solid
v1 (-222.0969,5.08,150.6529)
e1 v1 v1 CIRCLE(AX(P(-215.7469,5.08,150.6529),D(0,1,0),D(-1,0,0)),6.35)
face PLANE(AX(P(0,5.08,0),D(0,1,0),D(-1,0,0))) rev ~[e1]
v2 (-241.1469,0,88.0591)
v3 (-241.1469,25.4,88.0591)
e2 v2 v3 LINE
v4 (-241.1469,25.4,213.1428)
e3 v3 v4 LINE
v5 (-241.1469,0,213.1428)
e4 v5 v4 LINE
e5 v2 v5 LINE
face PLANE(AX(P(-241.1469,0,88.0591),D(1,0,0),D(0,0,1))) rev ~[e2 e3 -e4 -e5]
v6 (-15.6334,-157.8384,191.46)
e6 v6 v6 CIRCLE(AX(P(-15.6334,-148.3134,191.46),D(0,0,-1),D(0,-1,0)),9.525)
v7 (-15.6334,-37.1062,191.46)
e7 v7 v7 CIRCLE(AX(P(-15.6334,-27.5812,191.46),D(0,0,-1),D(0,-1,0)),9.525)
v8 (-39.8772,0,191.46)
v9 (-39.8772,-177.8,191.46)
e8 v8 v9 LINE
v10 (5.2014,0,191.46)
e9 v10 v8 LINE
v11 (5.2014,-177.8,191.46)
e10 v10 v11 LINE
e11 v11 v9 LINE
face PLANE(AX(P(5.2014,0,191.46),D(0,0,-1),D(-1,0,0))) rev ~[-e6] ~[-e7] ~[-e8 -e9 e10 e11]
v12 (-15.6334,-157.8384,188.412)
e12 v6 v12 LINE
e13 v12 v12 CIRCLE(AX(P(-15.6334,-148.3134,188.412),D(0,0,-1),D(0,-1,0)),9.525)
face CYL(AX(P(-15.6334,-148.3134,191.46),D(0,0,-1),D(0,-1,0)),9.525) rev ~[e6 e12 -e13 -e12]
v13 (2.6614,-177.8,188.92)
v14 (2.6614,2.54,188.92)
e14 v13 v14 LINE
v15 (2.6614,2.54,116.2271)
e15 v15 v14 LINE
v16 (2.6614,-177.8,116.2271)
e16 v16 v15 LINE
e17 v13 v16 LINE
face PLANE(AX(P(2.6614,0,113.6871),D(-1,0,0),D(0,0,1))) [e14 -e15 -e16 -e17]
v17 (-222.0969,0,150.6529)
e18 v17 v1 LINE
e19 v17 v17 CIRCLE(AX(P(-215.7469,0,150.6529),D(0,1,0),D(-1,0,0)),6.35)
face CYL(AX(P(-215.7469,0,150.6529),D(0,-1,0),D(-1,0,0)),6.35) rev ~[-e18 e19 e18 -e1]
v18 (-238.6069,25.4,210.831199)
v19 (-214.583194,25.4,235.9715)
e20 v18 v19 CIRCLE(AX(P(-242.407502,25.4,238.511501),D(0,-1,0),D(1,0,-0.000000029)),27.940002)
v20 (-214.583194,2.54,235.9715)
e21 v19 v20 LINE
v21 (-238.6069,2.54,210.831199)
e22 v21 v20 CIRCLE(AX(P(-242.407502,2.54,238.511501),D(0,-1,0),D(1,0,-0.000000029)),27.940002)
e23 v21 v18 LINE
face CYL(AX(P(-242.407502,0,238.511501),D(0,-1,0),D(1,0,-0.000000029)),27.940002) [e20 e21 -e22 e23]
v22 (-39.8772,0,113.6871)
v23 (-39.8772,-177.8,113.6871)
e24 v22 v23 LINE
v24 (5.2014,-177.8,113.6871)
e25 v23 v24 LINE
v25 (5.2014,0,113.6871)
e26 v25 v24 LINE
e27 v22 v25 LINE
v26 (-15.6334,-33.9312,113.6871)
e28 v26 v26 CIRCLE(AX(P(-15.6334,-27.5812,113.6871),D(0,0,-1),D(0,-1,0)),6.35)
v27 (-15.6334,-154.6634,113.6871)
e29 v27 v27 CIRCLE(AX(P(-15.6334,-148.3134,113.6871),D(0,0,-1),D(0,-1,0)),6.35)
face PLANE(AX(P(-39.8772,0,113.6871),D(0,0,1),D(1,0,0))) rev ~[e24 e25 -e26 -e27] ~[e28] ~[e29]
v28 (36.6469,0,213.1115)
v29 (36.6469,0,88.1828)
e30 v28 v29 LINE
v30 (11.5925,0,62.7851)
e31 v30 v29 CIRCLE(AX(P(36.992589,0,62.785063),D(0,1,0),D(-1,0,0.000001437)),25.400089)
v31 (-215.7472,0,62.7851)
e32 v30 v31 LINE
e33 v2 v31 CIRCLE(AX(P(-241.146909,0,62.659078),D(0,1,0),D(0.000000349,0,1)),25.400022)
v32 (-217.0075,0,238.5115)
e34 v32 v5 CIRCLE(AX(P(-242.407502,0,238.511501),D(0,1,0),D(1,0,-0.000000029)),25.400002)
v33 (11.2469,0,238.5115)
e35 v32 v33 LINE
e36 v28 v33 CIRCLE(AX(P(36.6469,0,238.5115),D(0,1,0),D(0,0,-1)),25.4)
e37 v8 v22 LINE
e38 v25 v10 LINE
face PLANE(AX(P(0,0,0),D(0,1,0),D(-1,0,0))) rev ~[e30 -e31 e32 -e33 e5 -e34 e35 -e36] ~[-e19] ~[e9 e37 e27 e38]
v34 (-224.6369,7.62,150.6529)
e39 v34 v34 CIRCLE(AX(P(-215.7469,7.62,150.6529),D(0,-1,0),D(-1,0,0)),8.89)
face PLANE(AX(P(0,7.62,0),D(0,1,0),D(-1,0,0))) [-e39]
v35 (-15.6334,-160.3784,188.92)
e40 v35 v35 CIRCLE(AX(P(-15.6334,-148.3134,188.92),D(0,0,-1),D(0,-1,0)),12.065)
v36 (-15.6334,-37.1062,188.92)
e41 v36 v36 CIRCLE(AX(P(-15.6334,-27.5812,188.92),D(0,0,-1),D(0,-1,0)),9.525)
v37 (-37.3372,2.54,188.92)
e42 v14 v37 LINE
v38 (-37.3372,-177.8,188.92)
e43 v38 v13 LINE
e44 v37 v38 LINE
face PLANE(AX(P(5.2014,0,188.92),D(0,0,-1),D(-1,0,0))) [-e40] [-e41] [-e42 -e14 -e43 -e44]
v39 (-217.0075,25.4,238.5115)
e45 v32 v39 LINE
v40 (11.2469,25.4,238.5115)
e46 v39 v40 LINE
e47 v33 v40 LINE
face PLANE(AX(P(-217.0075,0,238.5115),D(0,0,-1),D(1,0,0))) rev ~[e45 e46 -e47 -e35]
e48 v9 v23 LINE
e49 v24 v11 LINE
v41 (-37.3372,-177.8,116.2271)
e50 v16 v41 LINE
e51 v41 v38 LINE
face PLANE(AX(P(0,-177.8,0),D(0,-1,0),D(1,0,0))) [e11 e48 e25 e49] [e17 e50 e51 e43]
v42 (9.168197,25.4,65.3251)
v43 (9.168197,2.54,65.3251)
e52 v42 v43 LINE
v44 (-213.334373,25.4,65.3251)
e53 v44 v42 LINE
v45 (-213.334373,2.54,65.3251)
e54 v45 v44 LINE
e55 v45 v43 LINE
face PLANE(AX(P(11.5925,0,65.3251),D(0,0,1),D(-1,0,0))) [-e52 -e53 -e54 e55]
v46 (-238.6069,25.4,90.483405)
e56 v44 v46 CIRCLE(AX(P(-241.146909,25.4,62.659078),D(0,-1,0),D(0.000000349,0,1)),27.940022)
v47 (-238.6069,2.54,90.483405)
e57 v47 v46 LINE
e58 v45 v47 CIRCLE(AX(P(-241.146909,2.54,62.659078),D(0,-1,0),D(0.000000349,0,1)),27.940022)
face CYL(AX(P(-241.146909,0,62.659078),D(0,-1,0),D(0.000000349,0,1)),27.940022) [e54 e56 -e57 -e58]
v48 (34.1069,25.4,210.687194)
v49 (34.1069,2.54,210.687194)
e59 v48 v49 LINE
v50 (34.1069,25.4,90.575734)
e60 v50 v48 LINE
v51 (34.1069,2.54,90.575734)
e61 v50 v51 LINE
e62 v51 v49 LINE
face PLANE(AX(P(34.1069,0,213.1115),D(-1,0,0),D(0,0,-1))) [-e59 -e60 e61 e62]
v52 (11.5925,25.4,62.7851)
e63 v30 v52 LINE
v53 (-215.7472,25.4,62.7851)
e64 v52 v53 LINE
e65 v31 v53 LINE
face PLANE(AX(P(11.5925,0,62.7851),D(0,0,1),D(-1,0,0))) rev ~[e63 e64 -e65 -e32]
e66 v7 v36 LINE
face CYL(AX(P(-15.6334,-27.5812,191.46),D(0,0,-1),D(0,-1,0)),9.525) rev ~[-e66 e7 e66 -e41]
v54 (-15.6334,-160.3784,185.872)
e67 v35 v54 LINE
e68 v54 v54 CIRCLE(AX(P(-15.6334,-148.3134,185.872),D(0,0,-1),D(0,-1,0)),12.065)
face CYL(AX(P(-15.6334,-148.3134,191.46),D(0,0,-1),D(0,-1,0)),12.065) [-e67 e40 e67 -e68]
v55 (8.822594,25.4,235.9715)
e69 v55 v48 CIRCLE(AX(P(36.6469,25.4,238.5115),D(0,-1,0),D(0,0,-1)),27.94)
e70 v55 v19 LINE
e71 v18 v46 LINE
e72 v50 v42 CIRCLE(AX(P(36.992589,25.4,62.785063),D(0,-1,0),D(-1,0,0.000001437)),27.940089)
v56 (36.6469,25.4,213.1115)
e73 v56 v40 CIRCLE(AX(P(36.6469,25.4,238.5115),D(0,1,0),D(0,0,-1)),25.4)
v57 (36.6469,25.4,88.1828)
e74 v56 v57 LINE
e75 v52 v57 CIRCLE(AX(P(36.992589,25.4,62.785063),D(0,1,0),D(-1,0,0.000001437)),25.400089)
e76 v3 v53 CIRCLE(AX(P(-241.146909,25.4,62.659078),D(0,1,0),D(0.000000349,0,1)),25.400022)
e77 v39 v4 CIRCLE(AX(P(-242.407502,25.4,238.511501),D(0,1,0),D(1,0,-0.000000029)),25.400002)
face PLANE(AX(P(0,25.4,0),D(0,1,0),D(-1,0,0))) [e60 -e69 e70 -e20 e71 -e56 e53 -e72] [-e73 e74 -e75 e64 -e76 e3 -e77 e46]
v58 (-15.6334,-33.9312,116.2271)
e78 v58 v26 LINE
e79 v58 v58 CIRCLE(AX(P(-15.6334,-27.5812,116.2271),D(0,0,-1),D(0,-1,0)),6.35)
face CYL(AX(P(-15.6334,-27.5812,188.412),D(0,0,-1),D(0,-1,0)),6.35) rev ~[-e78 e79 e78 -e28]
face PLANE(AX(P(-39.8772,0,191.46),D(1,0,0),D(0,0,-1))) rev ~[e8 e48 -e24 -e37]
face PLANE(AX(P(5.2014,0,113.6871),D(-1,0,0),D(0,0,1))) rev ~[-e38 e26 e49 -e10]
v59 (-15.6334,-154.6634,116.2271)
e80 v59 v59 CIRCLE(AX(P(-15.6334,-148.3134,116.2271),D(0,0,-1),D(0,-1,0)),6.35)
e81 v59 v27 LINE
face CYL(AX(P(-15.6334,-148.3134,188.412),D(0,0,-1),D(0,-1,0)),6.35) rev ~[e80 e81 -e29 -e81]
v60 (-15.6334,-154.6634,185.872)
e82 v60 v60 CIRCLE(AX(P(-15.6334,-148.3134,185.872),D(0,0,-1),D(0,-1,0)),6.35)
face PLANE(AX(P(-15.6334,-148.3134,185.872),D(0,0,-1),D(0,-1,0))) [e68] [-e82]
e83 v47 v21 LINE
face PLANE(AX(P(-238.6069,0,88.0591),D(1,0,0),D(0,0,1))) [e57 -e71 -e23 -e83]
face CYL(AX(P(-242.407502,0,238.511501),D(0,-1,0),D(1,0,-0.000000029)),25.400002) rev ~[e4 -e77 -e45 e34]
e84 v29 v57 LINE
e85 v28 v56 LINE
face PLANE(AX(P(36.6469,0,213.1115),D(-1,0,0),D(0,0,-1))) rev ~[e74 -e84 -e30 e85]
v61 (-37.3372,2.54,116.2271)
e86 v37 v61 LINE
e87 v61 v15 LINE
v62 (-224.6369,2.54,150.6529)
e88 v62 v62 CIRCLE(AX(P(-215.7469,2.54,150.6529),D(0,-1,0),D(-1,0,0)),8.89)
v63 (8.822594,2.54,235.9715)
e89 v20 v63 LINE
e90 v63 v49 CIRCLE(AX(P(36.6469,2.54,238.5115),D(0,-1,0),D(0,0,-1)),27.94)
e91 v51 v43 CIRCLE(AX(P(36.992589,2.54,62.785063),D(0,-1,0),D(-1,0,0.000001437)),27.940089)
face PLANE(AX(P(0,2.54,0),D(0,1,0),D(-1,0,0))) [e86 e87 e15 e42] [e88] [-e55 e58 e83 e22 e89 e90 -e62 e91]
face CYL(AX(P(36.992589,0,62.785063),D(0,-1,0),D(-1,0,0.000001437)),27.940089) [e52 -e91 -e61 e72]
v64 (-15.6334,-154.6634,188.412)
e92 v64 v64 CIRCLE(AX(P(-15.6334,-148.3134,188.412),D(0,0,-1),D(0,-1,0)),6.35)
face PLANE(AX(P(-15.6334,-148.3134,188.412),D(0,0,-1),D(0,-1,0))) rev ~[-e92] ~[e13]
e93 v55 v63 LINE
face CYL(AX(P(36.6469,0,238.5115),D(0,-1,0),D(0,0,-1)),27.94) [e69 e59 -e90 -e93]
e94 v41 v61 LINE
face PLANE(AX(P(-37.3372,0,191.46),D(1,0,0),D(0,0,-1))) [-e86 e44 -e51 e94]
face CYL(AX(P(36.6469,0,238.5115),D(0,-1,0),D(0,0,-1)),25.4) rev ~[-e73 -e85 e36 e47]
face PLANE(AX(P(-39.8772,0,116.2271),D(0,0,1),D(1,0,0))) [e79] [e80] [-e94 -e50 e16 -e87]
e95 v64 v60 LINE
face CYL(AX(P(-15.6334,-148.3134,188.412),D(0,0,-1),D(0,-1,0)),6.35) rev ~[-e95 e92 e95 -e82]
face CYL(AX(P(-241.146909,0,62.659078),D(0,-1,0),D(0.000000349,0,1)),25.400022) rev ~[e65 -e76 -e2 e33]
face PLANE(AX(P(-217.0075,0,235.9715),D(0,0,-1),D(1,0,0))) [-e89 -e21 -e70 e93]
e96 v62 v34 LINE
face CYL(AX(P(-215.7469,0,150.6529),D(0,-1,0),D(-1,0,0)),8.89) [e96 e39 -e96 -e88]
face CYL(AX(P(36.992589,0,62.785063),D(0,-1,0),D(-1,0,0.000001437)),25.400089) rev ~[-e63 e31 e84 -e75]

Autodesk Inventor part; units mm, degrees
ref_plane "YZ Plane" through (0, 0, 0) normal (1, 0, 0) x (0, 1, 0)
ref_plane "XZ Plane" through (0, 0, 0) normal (0, 1, 0) x (-1, 0, 0)
ref_plane "XY Plane" through (0, 0, 0) normal (0, 0, 1) x (1, 0, 0)
sketch "Sketch1" plane through (0, 0, 0) normal (0, 1, 0) x (-1, 0, 0)
  line L0 (217.0075, 238.5115) -> (-11.2469, 238.5115)
  line L1 (-36.6469, 213.1115) -> (-36.6469, 88.1828)
  line L2 (-11.5925, 62.7851) -> (215.7472, 62.7851)
  line L3 (241.1469, 88.0591) -> (241.1469, 213.1428)
  arc A0 (217.0075, 238.5115) -> (241.1469, 213.1428) centre (242.4075, 238.5115) ccw
  arc A1 (241.1469, 88.0591) -> (215.7472, 62.7851) centre (241.1469, 62.6591) ccw
  arc A2 (-36.6469, 213.1115) -> (-11.2469, 238.5115) centre (-36.6469, 238.5115) ccw
  arc A3 (-11.5925, 62.7851) -> (-36.6469, 88.1828) centre (-36.9925, 62.7851) ccw
  circle A4 centre (215.7469, 150.6529) radius 9.525
  circle A5 centre (215.7469, 150.6529) radius 6.35
  point P0 (0, 0)
  dimension "d6" = 227.3398
  dimension "d7" = 277.7939
  dimension "d10" = 125.0838
  dimension "d11" = 175.7264
  dimension "d12" = 19.05
  dimension "d13" = 12.7
  dimension "d14" = 87.8586
  dimension "d15" = 25.4
extrude "Extrusion1" add sketch "Sketch1" along normal blind 25.4 contours A0 L3 A1 L2 A3 L1 A2 L0 | A4 | A5
extrude "Extrusion2" cut sketch "Sketch1" along normal blind 5.08 contours A5
sketch "Sketch2" plane through (0, 0, 0) normal (0, -1, 0) x (1, 0, 0)
  point P0 (0, 0)
sketch "Sketch3" plane through (0, 0, 0) normal (0, -1, 0) x (1, 0, 0)
  line L0 (-39.8772, 113.6871) -> (5.2014, 113.6871)
  line L1 (5.2014, 113.6871) -> (5.2014, 191.46)
  line L2 (5.2014, 191.46) -> (-39.8772, 191.46)
  line L3 (-39.8772, 191.46) -> (-39.8772, 113.6871)
  point P0 (0, 0)
extrude "Extrusion3" add sketch "Sketch3" along normal blind 177.8
sketch "Sketch4" plane through (-39.8772, 0, 191.46) normal (0, 0, 1) x (1, 0, 0)
  point P0 (39.8772, 0)
sketch "Sketch5" plane through (-39.8772, 0, 191.46) normal (0, 0, 1) x (1, 0, 0)
  circle A0 centre (24.2438, -148.3134) radius 6.35
  point P0 (39.8772, 0)
  dimension "d20" = 12.7
hole "Hole1" at (-15.6334, -148.3134, 191.46) direction (0, 0, -1) diameter 12.7 end through all counterbore diameter 19.05 counterbore depth 3.048
shell "Shell1" thickness 2.54 removed faces 2 at (-24.851, -177.8, 139.6114) at (-15.1224, -154.6429, 163.5037)
sketch "Sketch6" plane through (-39.8772, 0, 191.46) normal (0, 0, 1) x (1, 0, 0)
  circle A0 centre (24.2438, -27.5812) radius 6.35
  point P0 (39.8772, 0)
  dimension "d29" = 12.7
hole "Hole2" at (-15.6334, -27.5812, 191.46) direction (0, 0, -1) diameter 12.7 end through all counterbore diameter 19.05 counterbore depth 3.048
shell "Shell2" thickness 2.54 removed faces 3 at (-143.2625, 25.4, 176.3813) at (-140.9901, 22.86, 175.1392) at (-153.6846, 2.54, 191.1872)
properties part number "BASE"
